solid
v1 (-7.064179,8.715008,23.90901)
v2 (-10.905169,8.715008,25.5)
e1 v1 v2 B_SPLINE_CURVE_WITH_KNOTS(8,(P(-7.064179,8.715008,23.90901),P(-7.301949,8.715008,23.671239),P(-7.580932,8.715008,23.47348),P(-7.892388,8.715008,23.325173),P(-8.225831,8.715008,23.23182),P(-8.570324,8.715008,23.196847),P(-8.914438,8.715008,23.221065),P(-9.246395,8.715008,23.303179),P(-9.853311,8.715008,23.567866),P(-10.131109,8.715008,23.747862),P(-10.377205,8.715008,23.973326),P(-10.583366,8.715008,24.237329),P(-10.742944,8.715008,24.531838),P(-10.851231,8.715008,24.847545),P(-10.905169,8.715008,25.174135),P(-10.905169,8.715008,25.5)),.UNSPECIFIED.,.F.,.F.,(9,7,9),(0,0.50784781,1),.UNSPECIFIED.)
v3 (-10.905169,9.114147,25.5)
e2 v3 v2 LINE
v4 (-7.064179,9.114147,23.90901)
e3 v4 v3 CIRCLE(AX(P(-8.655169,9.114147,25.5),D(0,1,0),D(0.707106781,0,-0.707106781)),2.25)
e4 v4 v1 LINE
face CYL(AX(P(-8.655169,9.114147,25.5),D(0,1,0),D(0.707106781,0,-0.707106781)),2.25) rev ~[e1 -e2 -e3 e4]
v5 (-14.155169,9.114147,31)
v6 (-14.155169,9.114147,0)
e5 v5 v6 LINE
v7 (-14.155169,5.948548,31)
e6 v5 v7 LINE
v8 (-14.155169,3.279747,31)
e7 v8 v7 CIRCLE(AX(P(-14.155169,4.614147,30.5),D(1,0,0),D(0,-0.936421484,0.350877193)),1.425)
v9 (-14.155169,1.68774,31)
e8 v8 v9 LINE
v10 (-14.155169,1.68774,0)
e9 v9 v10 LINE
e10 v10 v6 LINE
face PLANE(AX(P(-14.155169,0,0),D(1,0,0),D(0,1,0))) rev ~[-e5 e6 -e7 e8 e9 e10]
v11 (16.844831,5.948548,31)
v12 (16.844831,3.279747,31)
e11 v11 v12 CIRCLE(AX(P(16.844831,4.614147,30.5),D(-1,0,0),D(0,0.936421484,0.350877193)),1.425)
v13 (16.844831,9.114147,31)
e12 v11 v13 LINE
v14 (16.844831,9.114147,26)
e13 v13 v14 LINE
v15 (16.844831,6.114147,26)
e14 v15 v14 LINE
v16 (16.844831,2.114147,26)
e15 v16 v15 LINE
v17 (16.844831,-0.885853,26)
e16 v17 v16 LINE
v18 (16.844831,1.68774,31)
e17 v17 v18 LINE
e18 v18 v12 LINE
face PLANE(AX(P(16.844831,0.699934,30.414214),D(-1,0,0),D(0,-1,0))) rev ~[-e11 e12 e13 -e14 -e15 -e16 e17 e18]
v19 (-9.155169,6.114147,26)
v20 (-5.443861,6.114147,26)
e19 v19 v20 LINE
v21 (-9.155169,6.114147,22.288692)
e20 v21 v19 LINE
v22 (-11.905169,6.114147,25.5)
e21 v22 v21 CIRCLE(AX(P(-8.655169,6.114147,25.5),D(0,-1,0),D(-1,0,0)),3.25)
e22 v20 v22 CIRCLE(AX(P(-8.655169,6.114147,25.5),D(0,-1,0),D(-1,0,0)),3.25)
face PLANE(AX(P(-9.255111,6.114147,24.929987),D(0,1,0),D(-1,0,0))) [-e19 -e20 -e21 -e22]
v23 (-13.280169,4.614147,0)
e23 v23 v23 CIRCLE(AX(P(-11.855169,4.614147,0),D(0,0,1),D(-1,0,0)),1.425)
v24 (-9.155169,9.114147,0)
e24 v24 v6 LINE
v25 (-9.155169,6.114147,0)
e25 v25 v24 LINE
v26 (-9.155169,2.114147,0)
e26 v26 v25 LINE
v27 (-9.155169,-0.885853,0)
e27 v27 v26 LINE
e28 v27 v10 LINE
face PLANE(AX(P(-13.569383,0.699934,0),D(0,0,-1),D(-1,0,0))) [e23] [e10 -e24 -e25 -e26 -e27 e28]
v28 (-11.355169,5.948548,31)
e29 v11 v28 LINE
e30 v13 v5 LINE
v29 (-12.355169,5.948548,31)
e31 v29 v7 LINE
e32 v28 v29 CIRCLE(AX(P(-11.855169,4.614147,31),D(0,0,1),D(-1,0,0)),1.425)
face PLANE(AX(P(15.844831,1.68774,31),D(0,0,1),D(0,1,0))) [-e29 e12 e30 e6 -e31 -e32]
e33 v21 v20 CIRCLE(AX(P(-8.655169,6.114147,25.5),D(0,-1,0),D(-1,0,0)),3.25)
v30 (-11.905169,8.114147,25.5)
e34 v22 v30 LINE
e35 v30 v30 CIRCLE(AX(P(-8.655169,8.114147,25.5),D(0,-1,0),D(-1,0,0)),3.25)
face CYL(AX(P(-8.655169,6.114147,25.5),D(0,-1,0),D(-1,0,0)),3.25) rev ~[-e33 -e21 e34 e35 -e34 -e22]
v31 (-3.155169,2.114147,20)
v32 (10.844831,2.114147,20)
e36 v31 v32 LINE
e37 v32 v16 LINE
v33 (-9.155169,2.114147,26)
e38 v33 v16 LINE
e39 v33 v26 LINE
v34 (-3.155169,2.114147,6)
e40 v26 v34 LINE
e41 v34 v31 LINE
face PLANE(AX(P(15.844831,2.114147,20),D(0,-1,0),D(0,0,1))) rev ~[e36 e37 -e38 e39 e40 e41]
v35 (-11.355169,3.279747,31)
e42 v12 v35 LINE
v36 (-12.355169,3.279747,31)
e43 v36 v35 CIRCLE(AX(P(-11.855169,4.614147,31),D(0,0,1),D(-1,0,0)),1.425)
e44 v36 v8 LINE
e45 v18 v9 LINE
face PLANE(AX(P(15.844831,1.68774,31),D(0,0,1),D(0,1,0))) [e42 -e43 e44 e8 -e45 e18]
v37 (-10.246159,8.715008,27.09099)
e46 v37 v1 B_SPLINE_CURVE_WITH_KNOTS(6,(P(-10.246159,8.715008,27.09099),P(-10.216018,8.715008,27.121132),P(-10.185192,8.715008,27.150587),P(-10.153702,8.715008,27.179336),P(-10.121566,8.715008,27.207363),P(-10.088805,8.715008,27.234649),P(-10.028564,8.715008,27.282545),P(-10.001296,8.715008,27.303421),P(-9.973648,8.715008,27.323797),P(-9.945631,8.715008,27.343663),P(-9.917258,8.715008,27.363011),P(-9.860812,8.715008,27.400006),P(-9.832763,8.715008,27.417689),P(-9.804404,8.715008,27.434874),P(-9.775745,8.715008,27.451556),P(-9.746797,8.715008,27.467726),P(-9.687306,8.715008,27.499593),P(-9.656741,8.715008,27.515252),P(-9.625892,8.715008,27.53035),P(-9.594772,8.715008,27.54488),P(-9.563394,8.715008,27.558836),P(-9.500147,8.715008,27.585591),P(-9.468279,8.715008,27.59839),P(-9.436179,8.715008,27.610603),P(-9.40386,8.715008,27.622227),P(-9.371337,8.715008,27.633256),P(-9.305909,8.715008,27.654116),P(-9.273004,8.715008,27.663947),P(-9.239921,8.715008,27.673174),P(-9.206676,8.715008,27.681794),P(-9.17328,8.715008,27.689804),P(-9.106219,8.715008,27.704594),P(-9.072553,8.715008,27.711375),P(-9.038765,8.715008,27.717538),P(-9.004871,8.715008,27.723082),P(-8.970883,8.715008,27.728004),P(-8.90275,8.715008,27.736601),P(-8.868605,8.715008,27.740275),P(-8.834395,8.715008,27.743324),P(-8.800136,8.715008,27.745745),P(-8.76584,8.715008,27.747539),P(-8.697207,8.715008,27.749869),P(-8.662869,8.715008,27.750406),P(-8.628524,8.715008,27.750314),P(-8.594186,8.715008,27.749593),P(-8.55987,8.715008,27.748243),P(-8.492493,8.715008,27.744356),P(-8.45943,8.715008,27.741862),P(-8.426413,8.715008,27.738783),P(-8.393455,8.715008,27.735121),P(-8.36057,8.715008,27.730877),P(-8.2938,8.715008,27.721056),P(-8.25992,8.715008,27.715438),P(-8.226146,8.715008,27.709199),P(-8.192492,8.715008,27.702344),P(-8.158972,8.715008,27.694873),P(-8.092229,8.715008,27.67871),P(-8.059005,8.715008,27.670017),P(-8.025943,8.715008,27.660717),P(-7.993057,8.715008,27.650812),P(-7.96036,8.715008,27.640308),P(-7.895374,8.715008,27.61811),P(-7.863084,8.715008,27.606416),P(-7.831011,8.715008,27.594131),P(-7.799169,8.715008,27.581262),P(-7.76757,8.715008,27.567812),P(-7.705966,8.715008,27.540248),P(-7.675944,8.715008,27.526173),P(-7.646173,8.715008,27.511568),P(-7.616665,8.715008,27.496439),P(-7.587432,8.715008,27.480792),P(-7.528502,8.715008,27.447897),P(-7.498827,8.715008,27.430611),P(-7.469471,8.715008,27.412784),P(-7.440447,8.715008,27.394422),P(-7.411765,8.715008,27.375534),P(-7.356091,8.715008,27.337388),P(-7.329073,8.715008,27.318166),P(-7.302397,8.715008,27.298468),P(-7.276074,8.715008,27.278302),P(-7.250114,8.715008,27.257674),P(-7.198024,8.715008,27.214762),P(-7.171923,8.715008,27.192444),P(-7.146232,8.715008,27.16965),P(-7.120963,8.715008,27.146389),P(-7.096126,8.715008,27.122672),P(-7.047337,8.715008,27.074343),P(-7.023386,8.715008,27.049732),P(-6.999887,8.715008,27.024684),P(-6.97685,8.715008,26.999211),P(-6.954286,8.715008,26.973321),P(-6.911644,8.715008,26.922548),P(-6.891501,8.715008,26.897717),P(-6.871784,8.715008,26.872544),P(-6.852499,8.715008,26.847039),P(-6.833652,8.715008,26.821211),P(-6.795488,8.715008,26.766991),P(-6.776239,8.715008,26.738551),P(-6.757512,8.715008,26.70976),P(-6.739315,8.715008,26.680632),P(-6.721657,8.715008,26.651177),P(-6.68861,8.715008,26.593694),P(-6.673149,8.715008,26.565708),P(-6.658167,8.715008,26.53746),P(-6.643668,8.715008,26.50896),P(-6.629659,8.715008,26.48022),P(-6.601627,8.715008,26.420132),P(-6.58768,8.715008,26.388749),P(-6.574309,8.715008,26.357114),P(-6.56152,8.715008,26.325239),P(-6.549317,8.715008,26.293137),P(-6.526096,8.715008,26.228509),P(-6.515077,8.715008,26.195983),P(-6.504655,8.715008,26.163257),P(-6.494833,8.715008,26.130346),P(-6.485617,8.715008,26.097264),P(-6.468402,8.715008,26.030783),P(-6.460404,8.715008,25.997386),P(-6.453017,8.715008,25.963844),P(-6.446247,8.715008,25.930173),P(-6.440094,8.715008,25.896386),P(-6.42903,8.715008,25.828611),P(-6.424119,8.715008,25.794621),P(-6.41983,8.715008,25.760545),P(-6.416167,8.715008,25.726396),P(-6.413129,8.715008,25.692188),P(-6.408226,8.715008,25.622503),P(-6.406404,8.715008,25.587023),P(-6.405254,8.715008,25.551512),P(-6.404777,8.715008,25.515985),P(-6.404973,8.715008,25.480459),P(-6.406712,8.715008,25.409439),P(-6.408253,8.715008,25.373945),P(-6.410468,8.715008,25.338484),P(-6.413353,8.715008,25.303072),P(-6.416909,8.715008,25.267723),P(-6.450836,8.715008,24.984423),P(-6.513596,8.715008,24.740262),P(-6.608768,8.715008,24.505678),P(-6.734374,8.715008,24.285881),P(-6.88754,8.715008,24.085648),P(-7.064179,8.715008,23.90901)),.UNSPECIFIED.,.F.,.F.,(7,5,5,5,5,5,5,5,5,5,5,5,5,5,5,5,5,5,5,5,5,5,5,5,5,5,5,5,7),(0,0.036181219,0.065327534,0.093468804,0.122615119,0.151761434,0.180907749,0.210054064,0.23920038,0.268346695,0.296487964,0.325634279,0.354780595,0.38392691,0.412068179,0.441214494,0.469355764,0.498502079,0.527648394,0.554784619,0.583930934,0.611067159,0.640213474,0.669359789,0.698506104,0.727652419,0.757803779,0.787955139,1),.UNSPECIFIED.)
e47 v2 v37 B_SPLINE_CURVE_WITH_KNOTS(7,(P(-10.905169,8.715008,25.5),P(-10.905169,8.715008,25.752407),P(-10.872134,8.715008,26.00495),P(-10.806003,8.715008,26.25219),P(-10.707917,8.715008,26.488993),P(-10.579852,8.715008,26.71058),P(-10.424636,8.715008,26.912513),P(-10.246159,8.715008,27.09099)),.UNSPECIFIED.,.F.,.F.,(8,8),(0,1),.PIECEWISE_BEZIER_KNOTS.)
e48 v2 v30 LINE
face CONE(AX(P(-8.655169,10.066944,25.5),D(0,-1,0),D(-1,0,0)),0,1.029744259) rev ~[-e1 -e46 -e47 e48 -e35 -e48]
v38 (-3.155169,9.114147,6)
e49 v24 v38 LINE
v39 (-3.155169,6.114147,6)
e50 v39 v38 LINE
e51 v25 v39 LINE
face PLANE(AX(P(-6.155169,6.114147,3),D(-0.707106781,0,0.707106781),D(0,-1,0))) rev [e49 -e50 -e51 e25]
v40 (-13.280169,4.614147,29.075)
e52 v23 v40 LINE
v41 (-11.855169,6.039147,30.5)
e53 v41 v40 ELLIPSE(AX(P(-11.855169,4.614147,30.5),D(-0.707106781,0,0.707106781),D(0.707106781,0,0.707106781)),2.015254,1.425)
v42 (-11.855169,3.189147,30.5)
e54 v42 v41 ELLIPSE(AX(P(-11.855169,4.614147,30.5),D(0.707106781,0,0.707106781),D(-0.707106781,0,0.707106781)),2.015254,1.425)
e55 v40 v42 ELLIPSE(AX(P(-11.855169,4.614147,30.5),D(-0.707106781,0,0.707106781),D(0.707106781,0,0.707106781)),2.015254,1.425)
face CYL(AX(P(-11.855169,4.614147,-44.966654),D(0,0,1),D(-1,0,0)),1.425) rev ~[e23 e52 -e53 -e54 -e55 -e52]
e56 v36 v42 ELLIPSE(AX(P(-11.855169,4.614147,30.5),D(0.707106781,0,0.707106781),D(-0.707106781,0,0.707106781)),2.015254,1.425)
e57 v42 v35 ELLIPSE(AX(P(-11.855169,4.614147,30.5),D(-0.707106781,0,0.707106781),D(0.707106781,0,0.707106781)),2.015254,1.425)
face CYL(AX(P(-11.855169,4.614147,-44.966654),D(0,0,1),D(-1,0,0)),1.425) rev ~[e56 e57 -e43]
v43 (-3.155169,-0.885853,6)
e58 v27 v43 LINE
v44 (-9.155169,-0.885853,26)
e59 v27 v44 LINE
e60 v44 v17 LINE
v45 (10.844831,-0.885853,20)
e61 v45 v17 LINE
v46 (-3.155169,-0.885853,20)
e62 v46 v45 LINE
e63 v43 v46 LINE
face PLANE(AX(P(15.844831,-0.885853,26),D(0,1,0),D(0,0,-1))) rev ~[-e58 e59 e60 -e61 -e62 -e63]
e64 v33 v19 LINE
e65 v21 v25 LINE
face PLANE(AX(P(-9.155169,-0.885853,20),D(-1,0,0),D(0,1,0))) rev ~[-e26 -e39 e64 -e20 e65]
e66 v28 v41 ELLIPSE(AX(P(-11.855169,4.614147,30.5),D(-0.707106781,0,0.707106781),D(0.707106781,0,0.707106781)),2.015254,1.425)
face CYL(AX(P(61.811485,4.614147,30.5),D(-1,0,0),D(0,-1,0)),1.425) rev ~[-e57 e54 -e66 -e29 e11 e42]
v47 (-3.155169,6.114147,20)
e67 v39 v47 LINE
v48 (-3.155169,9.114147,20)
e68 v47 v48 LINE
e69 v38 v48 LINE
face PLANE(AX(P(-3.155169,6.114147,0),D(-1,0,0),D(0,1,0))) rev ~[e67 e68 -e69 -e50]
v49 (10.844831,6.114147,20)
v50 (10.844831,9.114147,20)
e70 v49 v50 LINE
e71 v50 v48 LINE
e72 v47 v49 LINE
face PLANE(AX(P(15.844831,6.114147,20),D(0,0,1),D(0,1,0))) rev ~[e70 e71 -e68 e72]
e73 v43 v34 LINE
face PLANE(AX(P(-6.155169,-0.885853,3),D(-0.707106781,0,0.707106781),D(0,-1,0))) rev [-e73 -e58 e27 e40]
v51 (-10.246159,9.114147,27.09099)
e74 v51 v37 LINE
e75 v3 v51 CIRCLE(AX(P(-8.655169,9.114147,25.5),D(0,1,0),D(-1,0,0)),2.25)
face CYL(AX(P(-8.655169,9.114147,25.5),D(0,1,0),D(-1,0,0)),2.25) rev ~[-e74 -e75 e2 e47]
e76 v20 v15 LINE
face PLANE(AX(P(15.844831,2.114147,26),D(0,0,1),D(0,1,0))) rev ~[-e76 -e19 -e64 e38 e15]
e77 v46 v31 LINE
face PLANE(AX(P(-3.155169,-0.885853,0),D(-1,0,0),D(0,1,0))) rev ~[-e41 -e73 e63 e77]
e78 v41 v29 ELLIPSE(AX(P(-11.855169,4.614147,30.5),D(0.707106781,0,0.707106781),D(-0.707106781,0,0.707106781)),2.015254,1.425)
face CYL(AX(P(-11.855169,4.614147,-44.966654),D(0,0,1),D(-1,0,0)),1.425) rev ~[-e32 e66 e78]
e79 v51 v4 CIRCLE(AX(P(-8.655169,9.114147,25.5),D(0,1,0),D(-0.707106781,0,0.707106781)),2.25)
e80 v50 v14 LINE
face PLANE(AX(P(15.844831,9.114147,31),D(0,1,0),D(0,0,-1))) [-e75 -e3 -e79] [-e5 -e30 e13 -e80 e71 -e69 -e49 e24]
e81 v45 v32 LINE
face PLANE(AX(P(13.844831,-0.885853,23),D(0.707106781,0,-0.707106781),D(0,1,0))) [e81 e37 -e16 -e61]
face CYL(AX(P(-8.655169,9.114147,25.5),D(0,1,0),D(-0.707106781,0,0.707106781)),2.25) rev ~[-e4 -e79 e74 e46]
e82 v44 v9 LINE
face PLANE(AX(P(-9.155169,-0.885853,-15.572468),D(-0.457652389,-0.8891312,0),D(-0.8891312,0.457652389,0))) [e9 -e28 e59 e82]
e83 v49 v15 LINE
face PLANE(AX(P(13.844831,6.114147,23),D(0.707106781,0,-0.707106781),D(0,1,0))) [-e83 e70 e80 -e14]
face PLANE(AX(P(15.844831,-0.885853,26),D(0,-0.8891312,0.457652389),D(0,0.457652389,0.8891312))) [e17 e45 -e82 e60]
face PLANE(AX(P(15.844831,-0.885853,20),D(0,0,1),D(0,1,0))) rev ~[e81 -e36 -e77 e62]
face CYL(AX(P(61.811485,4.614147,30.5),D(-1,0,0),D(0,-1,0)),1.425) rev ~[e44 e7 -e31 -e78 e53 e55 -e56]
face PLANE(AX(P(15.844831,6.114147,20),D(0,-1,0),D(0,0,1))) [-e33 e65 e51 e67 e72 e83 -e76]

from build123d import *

# Parameters (mm, degrees)
F1_DEPTH      = 20
F2_W          = 7
F2_H          = 20
F3_DEPTH      = 2
F5_DEPTH      = 6
F6_W          = 3
F6_H          = 6
F7_DEPTH      = 25
F8_DEPTH      = 3
F12_DEPTH     = 2
F13_DEPTH     = 11
F14_T4_DEPTH  = 29
F14_T10_DEPTH = 28
F14_T17_DEPTH = 38.2867319519
F14_T24_DEPTH = 39.2867319519
F15_T1_DEPTH  = 61.1449358039
F15_T3_DEPTH  = 60.1449358039
F16_DEPTH     = 1
F17_SIZE      = 6
F20_D         = 2.85
F20_ON_F18_D  = 2.85
F22_DEPTH     = 3
F24_D         = 6.5
F24_DEPTH     = 2
F24_TIP       = 1.9527970118


# Not quite as in the source:
# - a fillet or chamfer that OpenCascade refuses, or shapes differently, is made with other operations: its cross-section is extruded or revolved along the edge and cut away or added


with BuildPart() as f1:
    # F0 (on Top) → F1 (new body)
    with BuildSketch(Plane.XY):
        Polygon((-3.1551690071, 9.1141472052), (-12.1551690071, 9.1141472052), (-12.1551690071, -0.8858527948), (-3.1551690071, -0.8858527948), (-3.1551690071, 2.1141472052), (-9.1551690071, 2.1141472052), (-9.1551690071, 6.1141472052), (-3.1551690071, 6.1141472052), align=None)
    extrude(amount=F1_DEPTH)

    # F2 (on face) → F3 (join)
    with BuildSketch(Plane(origin=(-12.1551690071, 0, 0), x_dir=(0, -1, 0), z_dir=(-1, 0, 0))):
        with Locations((-5.6141472052, 10)):
            Rectangle(F2_W, F2_H)
    extrude(amount=F3_DEPTH)

    # F4 (on face) → F5 (join)
    with BuildSketch(Plane.XY.offset(20)):
        Polygon((-12.1345976368, 9.1141472052), (-12.1551690071, 2.1141472052), (-12.1551690071, -0.8858527948), (-9.1551690071, -0.8858527948), (-9.1551690071, 2.1141472052), (-9.1551690071, 6.1141472052), (-9.1551690071, 9.1141472052), align=None)
    extrude(amount=F5_DEPTH)

    # F6 (on face) → F7 (join)
    with BuildSketch(Plane.YZ.offset(-9.1551690071)):
        with Locations((7.6141472052, 23)):
            Rectangle(F6_W, F6_H)
        with Locations((0.6141472052, 23)):
            Rectangle(F6_W, F6_H)
        Polygon((-0.8858527948, 26), (2.1141472052, 26), (6.1141472052, 26), (9.1141472052, 26), (9.1141472052, 29), (-0.8858527948, 29), align=None)
    extrude(amount=F7_DEPTH)

    # F8 (add): a face of the model
    f8_faces = [f1.faces().sort_by_distance(p)[0] for p in [
        (-10.6515768532, 4.1077318265, 26),
    ]]
    extrude(f8_faces, amount=F8_DEPTH)

    # F9: union 

    # F10: union 

    # F11 (on face) → F12 (join)
    with BuildSketch(Plane.XY.offset(29)):
        Polygon((-12.1345976368, 9.1141472052), (-12.1551690071, 2.1141472052), (15.8448309929, 2.1141472052), (15.8448309929, 9.1141472052), align=None)
    extrude(amount=F12_DEPTH)

    # F4 (on face) → F13 (join)
    with BuildSketch(Plane.XY.offset(20)):
        Polygon((-14.1551690071, 2.1141472052), (-12.1551690071, 2.1141472052), (-12.1345976368, 9.1141472052), (-14.1551690071, 9.1141472052), align=None)
    extrude(amount=F13_DEPTH)

    # F14: chamfer of 4 on 2 edges, made by hand


with BuildPart() as f14_tool2:
    # F14_s3 → F14_t4 (new body)
    with BuildSketch(Plane.XY):
        Polygon((-12.1551690071, -1.8858527948), (-16.1551690071, 2.1141472052), (-12.1551690071, 2.1141472052), align=None)
    extrude(amount=F14_T4_DEPTH)

    split(bisect_by=Plane.XZ.offset(0.8858527948), keep=Keep.BOTTOM)

    split(bisect_by=Plane.YZ.offset(-14.1551690071), keep=Keep.TOP)


with BuildPart() as f1_1:
    add(f1.part)

    # F14_t1: union F14_tool2
    add(f14_tool2.part)


with BuildPart() as f14_tool8:
    # F14_s9 → F14_t10 (new body)
    with BuildSketch(Plane.YZ.offset(-12.1551690071)):
        Polygon((-1.8858527948, 29), (2.1141472052, 33), (2.1141472052, 29), align=None)
    extrude(amount=F14_T10_DEPTH)

    split(bisect_by=Plane.XZ.offset(0.8858527948), keep=Keep.BOTTOM)

    split(bisect_by=Plane.XY.offset(31), keep=Keep.BOTTOM)


with BuildPart() as f1_2:
    add(f1_1.part)

    # F14_t7: union F14_tool8
    add(f14_tool8.part)


with BuildPart() as f14_tool15:
    # F14_s16 → F14_t17 (new body)
    with BuildSketch(Plane.YZ.offset(-22.4419009589)):
        Polygon((-1.8858527948, 29), (2.1141472052, 33), (2.1141472052, 29), align=None)
    extrude(amount=F14_T17_DEPTH)

    split(bisect_by=Plane.XZ.offset(0.8858527948), keep=Keep.BOTTOM)

    split(bisect_by=Plane.YZ.offset(-12.1551690071), keep=Keep.BOTTOM)

    split(bisect_by=Plane.YZ.offset(-14.1551690071), keep=Keep.TOP)

    split(bisect_by=Plane.XY.offset(31), keep=Keep.BOTTOM)


with BuildPart() as f14_tool22:
    # F14_s23 → F14_t24 (new body)
    with BuildSketch(Plane.XY):
        Polygon((-12.1551690071, -1.8858527948), (-16.1551690071, 2.1141472052), (-12.1551690071, 2.1141472052), align=None)
    extrude(amount=F14_T24_DEPTH)

    split(bisect_by=Plane.XZ.offset(0.8858527948), keep=Keep.BOTTOM)

    split(bisect_by=Plane.XY.offset(29), keep=Keep.TOP)

    split(bisect_by=Plane.YZ.offset(-14.1551690071), keep=Keep.TOP)

    split(bisect_by=Plane.XY.offset(31), keep=Keep.BOTTOM)


with BuildPart() as f14_tool15_1:
    add(f14_tool15.part)

    # F14_t29: intersect F14_tool22
    add(f14_tool22.part, mode=Mode.INTERSECT)


with BuildPart() as f1_3:
    add(f1_2.part)

    # F14_t13: union F14_tool15
    add(f14_tool15_1.part)

    # F15: chamfer of 4 x 6 on 2 edges, made by hand

    # F15_s2 → F15_t1 (cut)
    with BuildSketch(Plane.XY.offset(-15.5724679019)):
        Polygon((-9.1551690071, -0.8858527948), (-17.3978096942, 3.3567878923), (-13.1551690071, -0.8858527948), align=None)
    extrude(amount=F15_T1_DEPTH, mode=Mode.SUBTRACT)

    # F15_s4 → F15_t3 (cut)
    with BuildSketch(Plane.YZ.offset(-28.7276369091)):
        Polygon((-0.8858527948, 26), (3.3567878923, 34.2426406871), (-0.8858527948, 30), align=None)
    extrude(amount=F15_T3_DEPTH, mode=Mode.SUBTRACT)

    # F16 (add): a face of the model
    f16_faces = [f1_3.faces().sort_by_distance(p)[0] for p in [
        (15.8448309929, 6.2628078927, 23),
    ]]
    extrude(f16_faces, amount=F16_DEPTH)

    # F17
    f17_edges = [f1_3.edges().sort_by_distance(p)[0] for p in [
        (-3.155169, 0.614147, 0),
        (-3.155169, 7.614147, 0),
        (16.844831, 0.614147, 20),
        (16.844831, 7.614147, 20),
    ]]
    chamfer(f17_edges, length=F17_SIZE)

    # F20 (through all)
    with Locations(Plane(origin=(0, 0, 0), x_dir=(1, 0, 0), z_dir=(0, 0, -1))):
        with Locations((-11.8551690071, -4.6141472052)):
            Hole(F20_D / 2)

    # F20 on F18 (through all)
    with Locations(Plane.YZ.offset(16.8448309929)):
        with Locations((4.6141472052, 30.5)):
            Hole(F20_ON_F18_D / 2)

    # F21 (on face) → F22 (cut)
    with BuildSketch(Plane(origin=(0, 9.1141472052, 0), x_dir=(-1, 0, 0), z_dir=(0, 1, 0))):
        with BuildLine():
            Line((10.2461592647, 27.0909902577), (7.0641787494, 23.9090097423))
            ThreePointArc((7.0641787494, 23.9090097423), (9.5162067299, 23.4212710518), (10.9051690071, 25.5))
            ThreePointArc((10.9051690071, 25.5), (10.7338979552, 26.3610377228), (10.2461592647, 27.0909902577))
        make_face()
        with BuildLine():
            ThreePointArc((10.2461592647, 27.0909902577), (7.0641787494, 27.0909902577), (7.0641787494, 23.9090097423))
            Line((7.0641787494, 23.9090097423), (10.2461592647, 27.0909902577))
        make_face()
    extrude(amount=-F22_DEPTH, mode=Mode.SUBTRACT)

    # F24 (one way)
    with BuildSketch(Plane(origin=(0, 6.1141472052, 0), x_dir=(-1, 0, 0), z_dir=(0, -1, 0))):
        with Locations((8.6551690071, -25.5)):
            Circle(F24_D / 2)
    extrude(amount=-F24_DEPTH, mode=Mode.SUBTRACT)
    with Locations(Plane(origin=(0, 6.1141472052, 0), x_dir=(-1, 0, 0), z_dir=(0, -1, 0))):
        with Locations((8.6551690071, -25.5)):
            with Locations((0, 0, -(F24_DEPTH + F24_TIP / 2))):  # 118° drill point
                Cone(0, F24_D / 2, F24_TIP, mode=Mode.SUBTRACT)


solid = f1_3.part
